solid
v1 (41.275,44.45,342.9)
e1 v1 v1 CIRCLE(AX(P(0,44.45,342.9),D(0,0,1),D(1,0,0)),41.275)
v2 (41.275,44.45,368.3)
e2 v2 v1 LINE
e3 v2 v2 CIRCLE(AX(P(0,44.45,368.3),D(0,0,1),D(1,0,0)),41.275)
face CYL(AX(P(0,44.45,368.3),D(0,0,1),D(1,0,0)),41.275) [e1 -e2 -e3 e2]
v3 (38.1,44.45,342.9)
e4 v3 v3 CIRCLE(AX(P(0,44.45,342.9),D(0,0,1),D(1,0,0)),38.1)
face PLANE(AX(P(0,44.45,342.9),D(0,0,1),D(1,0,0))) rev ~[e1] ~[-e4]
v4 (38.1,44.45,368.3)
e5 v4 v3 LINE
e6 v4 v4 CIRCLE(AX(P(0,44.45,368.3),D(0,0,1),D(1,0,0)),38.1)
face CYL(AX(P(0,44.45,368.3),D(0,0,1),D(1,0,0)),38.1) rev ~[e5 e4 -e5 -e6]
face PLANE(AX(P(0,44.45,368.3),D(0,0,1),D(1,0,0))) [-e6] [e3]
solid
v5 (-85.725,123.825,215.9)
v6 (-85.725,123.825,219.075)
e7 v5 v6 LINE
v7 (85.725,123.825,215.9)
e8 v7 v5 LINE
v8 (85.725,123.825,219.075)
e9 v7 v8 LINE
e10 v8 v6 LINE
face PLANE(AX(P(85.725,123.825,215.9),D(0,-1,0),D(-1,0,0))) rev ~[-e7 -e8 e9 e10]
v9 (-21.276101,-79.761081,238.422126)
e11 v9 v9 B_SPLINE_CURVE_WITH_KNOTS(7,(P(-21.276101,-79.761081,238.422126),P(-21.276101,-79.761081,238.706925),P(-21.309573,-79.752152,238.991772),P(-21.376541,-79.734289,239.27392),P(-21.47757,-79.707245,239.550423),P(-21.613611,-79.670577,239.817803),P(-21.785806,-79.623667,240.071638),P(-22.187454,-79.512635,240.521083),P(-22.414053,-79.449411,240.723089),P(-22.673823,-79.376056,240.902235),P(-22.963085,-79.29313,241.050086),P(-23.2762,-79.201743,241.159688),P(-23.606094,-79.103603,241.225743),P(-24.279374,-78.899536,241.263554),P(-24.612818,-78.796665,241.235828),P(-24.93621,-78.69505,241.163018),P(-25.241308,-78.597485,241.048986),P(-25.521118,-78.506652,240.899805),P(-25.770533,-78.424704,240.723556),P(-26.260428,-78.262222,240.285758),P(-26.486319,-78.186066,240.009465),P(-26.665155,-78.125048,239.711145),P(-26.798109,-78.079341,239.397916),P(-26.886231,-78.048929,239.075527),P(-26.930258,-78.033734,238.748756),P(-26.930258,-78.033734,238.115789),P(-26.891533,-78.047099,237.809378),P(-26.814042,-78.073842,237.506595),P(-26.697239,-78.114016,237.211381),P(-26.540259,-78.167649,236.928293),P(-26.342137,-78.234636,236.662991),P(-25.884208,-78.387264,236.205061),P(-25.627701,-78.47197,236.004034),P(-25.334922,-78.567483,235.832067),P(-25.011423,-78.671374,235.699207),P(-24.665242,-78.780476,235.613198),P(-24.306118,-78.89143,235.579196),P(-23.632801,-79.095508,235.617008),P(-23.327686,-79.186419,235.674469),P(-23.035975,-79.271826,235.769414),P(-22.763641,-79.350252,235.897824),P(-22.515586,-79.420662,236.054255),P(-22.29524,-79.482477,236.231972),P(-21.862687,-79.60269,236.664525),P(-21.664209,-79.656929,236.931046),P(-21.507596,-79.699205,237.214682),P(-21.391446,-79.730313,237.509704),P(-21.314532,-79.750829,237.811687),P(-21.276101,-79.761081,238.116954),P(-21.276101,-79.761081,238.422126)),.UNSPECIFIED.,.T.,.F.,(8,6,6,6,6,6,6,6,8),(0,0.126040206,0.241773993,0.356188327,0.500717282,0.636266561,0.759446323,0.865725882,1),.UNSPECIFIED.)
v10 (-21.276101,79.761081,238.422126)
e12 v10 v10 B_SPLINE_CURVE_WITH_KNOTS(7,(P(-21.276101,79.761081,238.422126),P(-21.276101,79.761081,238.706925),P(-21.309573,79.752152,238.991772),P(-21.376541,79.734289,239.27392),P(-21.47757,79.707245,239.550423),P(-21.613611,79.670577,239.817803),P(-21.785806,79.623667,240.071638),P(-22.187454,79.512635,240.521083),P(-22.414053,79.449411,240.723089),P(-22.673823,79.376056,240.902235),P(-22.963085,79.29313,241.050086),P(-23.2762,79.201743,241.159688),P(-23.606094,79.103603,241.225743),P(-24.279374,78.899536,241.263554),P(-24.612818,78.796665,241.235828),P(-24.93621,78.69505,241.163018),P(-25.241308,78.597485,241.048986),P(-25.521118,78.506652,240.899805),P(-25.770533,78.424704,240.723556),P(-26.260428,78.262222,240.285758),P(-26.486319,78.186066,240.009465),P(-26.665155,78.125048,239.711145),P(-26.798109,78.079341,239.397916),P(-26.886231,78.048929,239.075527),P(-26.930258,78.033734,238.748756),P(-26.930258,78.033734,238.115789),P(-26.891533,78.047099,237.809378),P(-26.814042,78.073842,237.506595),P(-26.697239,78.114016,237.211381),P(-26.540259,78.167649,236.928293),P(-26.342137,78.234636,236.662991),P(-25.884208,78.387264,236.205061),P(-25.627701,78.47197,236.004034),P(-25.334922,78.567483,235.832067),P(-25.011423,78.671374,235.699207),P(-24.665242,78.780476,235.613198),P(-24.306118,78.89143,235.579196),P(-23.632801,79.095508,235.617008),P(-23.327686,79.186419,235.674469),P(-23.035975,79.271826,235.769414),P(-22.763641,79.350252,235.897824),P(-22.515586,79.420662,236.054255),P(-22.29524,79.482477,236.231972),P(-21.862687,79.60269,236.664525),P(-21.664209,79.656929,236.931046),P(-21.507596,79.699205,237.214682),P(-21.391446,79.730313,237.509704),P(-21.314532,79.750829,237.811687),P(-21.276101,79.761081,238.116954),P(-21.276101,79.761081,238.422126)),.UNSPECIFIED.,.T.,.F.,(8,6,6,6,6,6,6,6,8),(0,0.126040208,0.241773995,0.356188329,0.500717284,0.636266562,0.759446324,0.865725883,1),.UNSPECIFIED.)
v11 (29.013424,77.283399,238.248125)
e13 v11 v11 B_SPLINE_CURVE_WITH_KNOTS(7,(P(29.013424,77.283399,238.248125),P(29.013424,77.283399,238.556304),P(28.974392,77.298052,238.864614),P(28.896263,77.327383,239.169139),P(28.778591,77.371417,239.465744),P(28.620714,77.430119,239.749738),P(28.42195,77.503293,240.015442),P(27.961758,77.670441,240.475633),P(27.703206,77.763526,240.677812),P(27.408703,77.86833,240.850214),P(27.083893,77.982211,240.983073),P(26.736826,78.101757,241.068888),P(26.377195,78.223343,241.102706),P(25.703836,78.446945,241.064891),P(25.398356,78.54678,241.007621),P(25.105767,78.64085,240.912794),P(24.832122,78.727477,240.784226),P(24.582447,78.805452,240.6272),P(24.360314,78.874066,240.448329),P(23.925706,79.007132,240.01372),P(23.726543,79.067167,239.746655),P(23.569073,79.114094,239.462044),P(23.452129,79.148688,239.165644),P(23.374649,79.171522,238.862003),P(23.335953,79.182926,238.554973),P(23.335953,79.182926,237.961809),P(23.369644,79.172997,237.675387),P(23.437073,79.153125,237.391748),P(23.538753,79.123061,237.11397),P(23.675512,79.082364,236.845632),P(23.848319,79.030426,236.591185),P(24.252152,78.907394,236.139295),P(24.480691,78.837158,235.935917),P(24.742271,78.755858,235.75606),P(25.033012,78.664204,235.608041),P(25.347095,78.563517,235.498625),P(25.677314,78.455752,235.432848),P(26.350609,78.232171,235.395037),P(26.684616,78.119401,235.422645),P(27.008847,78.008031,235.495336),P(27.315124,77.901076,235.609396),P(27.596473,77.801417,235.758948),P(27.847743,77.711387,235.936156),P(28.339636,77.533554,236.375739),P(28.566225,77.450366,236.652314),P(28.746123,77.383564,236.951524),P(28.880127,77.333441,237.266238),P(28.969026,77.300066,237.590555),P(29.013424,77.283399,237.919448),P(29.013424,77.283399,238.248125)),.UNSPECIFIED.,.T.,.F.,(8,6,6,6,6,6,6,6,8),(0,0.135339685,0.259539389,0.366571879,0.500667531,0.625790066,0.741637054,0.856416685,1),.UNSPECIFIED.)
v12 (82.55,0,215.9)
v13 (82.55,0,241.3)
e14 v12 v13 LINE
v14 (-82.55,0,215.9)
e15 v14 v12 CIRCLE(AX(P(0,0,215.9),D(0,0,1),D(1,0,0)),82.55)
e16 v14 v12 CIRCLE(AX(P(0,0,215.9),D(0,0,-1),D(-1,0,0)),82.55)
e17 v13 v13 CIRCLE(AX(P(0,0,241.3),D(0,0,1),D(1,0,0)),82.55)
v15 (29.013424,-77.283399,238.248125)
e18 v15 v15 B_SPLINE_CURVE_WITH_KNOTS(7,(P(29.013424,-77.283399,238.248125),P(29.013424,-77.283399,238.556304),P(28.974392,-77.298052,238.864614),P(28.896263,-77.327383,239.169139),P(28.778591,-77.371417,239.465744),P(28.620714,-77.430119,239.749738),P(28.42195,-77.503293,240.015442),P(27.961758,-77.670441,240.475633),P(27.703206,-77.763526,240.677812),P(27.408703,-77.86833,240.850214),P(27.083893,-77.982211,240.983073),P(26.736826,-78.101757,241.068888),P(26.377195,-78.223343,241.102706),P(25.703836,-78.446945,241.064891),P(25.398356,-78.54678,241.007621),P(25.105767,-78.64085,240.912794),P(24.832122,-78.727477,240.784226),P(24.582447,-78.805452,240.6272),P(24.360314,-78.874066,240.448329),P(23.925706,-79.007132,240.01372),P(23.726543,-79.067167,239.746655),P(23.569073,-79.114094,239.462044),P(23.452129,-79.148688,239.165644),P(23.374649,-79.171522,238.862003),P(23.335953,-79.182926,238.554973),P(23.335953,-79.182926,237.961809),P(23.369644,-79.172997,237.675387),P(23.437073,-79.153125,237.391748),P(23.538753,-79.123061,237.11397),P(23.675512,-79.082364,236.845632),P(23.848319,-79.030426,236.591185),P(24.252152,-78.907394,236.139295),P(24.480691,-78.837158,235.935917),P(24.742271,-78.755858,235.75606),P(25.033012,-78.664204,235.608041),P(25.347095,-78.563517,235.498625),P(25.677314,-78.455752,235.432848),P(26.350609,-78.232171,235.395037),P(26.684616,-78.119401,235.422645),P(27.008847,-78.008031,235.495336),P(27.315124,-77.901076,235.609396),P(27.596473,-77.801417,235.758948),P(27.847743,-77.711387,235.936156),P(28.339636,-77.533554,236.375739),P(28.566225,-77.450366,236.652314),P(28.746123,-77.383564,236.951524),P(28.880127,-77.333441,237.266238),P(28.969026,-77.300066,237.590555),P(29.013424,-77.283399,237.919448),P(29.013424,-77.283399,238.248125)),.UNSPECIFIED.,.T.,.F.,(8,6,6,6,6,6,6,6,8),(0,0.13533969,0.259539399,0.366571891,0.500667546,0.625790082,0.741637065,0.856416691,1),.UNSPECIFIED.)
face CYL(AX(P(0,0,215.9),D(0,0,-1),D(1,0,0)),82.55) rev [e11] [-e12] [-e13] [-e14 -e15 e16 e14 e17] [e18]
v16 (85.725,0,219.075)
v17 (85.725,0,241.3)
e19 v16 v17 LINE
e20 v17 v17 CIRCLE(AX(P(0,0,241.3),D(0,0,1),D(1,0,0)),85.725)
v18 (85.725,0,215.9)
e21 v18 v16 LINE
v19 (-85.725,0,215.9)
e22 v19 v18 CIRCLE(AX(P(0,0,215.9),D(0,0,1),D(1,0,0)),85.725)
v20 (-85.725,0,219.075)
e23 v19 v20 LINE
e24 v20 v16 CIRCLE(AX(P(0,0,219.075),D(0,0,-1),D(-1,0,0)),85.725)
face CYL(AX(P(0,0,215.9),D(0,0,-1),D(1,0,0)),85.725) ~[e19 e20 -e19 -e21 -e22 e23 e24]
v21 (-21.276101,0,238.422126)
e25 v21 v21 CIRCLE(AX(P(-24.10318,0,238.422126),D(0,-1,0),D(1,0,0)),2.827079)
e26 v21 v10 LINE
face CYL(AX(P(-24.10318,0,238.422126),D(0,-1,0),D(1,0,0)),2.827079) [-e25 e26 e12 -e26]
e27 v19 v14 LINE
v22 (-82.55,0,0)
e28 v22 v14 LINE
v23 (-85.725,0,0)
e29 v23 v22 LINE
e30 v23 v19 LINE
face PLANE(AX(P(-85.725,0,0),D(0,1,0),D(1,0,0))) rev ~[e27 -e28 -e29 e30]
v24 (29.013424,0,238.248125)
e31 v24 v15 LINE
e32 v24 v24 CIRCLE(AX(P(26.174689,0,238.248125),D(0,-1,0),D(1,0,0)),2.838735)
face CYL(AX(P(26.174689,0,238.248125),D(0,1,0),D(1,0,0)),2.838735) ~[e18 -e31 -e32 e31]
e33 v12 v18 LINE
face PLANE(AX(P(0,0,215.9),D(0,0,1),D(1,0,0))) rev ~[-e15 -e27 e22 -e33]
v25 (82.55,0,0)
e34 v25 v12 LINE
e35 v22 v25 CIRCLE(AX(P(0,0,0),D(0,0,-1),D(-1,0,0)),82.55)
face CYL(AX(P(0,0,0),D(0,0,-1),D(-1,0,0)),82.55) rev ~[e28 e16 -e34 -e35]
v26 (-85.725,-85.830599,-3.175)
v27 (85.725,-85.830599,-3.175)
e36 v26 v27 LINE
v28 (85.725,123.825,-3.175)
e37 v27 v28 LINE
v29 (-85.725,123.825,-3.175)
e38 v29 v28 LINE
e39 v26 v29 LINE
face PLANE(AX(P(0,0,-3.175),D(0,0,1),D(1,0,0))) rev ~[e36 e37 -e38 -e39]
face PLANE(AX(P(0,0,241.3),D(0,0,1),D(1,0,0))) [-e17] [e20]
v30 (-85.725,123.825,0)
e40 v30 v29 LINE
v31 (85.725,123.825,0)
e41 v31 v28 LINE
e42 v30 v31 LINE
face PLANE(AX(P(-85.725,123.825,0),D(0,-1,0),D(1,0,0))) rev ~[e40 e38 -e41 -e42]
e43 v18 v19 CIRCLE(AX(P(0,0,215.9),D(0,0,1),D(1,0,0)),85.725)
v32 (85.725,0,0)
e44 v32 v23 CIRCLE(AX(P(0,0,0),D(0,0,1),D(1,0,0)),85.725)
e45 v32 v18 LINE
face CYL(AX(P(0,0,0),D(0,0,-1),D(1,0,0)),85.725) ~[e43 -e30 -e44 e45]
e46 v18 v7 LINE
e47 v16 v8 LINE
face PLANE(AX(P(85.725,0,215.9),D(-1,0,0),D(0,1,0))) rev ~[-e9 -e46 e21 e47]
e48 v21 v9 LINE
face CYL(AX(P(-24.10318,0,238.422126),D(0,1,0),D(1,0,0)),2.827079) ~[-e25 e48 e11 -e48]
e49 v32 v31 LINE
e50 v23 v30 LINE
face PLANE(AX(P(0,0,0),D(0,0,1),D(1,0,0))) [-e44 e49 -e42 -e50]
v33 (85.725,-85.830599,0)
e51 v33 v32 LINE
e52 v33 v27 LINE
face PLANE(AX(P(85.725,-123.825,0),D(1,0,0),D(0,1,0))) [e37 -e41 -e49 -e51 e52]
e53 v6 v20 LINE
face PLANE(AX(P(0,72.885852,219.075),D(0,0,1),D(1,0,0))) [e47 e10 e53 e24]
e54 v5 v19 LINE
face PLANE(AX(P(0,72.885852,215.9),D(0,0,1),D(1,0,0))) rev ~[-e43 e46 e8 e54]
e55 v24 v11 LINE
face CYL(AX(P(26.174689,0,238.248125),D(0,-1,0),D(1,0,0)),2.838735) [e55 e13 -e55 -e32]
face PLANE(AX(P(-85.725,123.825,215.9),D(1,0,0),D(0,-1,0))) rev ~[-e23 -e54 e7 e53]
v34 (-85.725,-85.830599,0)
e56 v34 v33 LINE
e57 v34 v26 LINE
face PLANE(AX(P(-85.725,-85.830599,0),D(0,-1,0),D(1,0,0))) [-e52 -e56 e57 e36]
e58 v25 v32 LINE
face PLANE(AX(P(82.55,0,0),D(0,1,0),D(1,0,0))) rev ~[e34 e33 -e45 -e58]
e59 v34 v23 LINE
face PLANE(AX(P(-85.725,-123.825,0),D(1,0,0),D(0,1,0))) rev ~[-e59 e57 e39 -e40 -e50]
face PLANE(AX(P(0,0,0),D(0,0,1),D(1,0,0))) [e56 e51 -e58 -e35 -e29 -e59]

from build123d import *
from build123d import SkipClean  # not in build123d's __all__

# Parameters (mm, degrees)
F1_DEPTH       = 215.9
F2_W           = 171.45
F2_H           = 247.65
F3_DEPTH       = 3.175
F4_W           = 171.45
F4_H           = 37.9944009304
F5_DEPTH       = 25.4
F7_R           = 85.725
F7_R_2         = 82.55
F9_DEPTH       = 25.4
F10_R          = 41.275
F10_R_2        = 38.1
F11_DEPTH      = 25.4
F13_DEPTH      = 3.175
F14_R          = 2.8270786392
F14_R_2        = 2.8387354089
F15_DEPTH      = 79.7610810168
F15_DEPTH_BACK = 79.7610810168


# Not quite as in the source:
# - after a boolean that leaves OpenCascade's solid faulty, fix() repairs it


with BuildPart() as f1:
    # F0 (on Top) → F1 (new body)
    with BuildSketch(Plane.XY):
        with BuildLine():
            ThreePointArc((-82.55, 0), (0, 82.55), (82.55, 0))
            Line((82.55, 0), (85.725, 0))
            ThreePointArc((85.725, 0), (0, 85.725), (-85.725, 0))
            Line((-85.725, 0), (-82.55, 0))
        make_face()
    extrude(amount=F1_DEPTH)

    # F2 (on Top) → F3 (join)
    with BuildSketch(Plane.XY):
        Rectangle(F2_W, F2_H)
    extrude(amount=-F3_DEPTH)

    # F4 (on face) → F5 (cut)
    with BuildSketch(Plane.XY):
        with Locations((0, -104.8277995348)):
            Rectangle(F4_W, F4_H)
    extrude(amount=-F5_DEPTH, mode=Mode.SUBTRACT)

    # F7 (on offset) → F9 (join)
    with BuildSketch(Plane.XY.offset(215.9)):
        Circle(F7_R)
        Circle(F7_R_2, mode=Mode.SUBTRACT)
    with SkipClean():  # cleaning this boolean's faces spoils the solid; the shape is the same uncleaned
        extrude(amount=F9_DEPTH)

    # F12 (on offset) → F13 (join)
    with BuildSketch(Plane.XY.offset(215.9)):
        with BuildLine():
            Line((-85.725, 123.825), (-85.725, 0))
            ThreePointArc((-85.725, 0), (0, 85.725), (85.725, 0))
            Line((85.725, 0), (85.725, 123.825))
            Line((85.725, 123.825), (-85.725, 123.825))
        make_face()
    extrude(amount=F13_DEPTH)

    add(f1.part.fix(), mode=Mode.REPLACE)

    # F14 (on Front) → F15 (join, two sides)
    with BuildSketch(Plane.XZ) as f15_sk:
        with Locations((-24.103179574, 238.4221255779)):
            Circle(F14_R)
        with Locations((26.1746887118, 238.2481247187)):
            Circle(F14_R_2)
    extrude(amount=F15_DEPTH)
    extrude(f15_sk.sketch, amount=-F15_DEPTH_BACK)


with BuildPart() as f11:
    # F10 (on offset) → F11 (new body)
    with BuildSketch(Plane.XY.offset(368.3)):
        with Locations((0, 44.45)):
            Circle(F10_R)
        with Locations((0, 44.45)):
            Circle(F10_R_2, mode=Mode.SUBTRACT)
    extrude(amount=-F11_DEPTH)


solid = Compound([f1.part, f11.part])
